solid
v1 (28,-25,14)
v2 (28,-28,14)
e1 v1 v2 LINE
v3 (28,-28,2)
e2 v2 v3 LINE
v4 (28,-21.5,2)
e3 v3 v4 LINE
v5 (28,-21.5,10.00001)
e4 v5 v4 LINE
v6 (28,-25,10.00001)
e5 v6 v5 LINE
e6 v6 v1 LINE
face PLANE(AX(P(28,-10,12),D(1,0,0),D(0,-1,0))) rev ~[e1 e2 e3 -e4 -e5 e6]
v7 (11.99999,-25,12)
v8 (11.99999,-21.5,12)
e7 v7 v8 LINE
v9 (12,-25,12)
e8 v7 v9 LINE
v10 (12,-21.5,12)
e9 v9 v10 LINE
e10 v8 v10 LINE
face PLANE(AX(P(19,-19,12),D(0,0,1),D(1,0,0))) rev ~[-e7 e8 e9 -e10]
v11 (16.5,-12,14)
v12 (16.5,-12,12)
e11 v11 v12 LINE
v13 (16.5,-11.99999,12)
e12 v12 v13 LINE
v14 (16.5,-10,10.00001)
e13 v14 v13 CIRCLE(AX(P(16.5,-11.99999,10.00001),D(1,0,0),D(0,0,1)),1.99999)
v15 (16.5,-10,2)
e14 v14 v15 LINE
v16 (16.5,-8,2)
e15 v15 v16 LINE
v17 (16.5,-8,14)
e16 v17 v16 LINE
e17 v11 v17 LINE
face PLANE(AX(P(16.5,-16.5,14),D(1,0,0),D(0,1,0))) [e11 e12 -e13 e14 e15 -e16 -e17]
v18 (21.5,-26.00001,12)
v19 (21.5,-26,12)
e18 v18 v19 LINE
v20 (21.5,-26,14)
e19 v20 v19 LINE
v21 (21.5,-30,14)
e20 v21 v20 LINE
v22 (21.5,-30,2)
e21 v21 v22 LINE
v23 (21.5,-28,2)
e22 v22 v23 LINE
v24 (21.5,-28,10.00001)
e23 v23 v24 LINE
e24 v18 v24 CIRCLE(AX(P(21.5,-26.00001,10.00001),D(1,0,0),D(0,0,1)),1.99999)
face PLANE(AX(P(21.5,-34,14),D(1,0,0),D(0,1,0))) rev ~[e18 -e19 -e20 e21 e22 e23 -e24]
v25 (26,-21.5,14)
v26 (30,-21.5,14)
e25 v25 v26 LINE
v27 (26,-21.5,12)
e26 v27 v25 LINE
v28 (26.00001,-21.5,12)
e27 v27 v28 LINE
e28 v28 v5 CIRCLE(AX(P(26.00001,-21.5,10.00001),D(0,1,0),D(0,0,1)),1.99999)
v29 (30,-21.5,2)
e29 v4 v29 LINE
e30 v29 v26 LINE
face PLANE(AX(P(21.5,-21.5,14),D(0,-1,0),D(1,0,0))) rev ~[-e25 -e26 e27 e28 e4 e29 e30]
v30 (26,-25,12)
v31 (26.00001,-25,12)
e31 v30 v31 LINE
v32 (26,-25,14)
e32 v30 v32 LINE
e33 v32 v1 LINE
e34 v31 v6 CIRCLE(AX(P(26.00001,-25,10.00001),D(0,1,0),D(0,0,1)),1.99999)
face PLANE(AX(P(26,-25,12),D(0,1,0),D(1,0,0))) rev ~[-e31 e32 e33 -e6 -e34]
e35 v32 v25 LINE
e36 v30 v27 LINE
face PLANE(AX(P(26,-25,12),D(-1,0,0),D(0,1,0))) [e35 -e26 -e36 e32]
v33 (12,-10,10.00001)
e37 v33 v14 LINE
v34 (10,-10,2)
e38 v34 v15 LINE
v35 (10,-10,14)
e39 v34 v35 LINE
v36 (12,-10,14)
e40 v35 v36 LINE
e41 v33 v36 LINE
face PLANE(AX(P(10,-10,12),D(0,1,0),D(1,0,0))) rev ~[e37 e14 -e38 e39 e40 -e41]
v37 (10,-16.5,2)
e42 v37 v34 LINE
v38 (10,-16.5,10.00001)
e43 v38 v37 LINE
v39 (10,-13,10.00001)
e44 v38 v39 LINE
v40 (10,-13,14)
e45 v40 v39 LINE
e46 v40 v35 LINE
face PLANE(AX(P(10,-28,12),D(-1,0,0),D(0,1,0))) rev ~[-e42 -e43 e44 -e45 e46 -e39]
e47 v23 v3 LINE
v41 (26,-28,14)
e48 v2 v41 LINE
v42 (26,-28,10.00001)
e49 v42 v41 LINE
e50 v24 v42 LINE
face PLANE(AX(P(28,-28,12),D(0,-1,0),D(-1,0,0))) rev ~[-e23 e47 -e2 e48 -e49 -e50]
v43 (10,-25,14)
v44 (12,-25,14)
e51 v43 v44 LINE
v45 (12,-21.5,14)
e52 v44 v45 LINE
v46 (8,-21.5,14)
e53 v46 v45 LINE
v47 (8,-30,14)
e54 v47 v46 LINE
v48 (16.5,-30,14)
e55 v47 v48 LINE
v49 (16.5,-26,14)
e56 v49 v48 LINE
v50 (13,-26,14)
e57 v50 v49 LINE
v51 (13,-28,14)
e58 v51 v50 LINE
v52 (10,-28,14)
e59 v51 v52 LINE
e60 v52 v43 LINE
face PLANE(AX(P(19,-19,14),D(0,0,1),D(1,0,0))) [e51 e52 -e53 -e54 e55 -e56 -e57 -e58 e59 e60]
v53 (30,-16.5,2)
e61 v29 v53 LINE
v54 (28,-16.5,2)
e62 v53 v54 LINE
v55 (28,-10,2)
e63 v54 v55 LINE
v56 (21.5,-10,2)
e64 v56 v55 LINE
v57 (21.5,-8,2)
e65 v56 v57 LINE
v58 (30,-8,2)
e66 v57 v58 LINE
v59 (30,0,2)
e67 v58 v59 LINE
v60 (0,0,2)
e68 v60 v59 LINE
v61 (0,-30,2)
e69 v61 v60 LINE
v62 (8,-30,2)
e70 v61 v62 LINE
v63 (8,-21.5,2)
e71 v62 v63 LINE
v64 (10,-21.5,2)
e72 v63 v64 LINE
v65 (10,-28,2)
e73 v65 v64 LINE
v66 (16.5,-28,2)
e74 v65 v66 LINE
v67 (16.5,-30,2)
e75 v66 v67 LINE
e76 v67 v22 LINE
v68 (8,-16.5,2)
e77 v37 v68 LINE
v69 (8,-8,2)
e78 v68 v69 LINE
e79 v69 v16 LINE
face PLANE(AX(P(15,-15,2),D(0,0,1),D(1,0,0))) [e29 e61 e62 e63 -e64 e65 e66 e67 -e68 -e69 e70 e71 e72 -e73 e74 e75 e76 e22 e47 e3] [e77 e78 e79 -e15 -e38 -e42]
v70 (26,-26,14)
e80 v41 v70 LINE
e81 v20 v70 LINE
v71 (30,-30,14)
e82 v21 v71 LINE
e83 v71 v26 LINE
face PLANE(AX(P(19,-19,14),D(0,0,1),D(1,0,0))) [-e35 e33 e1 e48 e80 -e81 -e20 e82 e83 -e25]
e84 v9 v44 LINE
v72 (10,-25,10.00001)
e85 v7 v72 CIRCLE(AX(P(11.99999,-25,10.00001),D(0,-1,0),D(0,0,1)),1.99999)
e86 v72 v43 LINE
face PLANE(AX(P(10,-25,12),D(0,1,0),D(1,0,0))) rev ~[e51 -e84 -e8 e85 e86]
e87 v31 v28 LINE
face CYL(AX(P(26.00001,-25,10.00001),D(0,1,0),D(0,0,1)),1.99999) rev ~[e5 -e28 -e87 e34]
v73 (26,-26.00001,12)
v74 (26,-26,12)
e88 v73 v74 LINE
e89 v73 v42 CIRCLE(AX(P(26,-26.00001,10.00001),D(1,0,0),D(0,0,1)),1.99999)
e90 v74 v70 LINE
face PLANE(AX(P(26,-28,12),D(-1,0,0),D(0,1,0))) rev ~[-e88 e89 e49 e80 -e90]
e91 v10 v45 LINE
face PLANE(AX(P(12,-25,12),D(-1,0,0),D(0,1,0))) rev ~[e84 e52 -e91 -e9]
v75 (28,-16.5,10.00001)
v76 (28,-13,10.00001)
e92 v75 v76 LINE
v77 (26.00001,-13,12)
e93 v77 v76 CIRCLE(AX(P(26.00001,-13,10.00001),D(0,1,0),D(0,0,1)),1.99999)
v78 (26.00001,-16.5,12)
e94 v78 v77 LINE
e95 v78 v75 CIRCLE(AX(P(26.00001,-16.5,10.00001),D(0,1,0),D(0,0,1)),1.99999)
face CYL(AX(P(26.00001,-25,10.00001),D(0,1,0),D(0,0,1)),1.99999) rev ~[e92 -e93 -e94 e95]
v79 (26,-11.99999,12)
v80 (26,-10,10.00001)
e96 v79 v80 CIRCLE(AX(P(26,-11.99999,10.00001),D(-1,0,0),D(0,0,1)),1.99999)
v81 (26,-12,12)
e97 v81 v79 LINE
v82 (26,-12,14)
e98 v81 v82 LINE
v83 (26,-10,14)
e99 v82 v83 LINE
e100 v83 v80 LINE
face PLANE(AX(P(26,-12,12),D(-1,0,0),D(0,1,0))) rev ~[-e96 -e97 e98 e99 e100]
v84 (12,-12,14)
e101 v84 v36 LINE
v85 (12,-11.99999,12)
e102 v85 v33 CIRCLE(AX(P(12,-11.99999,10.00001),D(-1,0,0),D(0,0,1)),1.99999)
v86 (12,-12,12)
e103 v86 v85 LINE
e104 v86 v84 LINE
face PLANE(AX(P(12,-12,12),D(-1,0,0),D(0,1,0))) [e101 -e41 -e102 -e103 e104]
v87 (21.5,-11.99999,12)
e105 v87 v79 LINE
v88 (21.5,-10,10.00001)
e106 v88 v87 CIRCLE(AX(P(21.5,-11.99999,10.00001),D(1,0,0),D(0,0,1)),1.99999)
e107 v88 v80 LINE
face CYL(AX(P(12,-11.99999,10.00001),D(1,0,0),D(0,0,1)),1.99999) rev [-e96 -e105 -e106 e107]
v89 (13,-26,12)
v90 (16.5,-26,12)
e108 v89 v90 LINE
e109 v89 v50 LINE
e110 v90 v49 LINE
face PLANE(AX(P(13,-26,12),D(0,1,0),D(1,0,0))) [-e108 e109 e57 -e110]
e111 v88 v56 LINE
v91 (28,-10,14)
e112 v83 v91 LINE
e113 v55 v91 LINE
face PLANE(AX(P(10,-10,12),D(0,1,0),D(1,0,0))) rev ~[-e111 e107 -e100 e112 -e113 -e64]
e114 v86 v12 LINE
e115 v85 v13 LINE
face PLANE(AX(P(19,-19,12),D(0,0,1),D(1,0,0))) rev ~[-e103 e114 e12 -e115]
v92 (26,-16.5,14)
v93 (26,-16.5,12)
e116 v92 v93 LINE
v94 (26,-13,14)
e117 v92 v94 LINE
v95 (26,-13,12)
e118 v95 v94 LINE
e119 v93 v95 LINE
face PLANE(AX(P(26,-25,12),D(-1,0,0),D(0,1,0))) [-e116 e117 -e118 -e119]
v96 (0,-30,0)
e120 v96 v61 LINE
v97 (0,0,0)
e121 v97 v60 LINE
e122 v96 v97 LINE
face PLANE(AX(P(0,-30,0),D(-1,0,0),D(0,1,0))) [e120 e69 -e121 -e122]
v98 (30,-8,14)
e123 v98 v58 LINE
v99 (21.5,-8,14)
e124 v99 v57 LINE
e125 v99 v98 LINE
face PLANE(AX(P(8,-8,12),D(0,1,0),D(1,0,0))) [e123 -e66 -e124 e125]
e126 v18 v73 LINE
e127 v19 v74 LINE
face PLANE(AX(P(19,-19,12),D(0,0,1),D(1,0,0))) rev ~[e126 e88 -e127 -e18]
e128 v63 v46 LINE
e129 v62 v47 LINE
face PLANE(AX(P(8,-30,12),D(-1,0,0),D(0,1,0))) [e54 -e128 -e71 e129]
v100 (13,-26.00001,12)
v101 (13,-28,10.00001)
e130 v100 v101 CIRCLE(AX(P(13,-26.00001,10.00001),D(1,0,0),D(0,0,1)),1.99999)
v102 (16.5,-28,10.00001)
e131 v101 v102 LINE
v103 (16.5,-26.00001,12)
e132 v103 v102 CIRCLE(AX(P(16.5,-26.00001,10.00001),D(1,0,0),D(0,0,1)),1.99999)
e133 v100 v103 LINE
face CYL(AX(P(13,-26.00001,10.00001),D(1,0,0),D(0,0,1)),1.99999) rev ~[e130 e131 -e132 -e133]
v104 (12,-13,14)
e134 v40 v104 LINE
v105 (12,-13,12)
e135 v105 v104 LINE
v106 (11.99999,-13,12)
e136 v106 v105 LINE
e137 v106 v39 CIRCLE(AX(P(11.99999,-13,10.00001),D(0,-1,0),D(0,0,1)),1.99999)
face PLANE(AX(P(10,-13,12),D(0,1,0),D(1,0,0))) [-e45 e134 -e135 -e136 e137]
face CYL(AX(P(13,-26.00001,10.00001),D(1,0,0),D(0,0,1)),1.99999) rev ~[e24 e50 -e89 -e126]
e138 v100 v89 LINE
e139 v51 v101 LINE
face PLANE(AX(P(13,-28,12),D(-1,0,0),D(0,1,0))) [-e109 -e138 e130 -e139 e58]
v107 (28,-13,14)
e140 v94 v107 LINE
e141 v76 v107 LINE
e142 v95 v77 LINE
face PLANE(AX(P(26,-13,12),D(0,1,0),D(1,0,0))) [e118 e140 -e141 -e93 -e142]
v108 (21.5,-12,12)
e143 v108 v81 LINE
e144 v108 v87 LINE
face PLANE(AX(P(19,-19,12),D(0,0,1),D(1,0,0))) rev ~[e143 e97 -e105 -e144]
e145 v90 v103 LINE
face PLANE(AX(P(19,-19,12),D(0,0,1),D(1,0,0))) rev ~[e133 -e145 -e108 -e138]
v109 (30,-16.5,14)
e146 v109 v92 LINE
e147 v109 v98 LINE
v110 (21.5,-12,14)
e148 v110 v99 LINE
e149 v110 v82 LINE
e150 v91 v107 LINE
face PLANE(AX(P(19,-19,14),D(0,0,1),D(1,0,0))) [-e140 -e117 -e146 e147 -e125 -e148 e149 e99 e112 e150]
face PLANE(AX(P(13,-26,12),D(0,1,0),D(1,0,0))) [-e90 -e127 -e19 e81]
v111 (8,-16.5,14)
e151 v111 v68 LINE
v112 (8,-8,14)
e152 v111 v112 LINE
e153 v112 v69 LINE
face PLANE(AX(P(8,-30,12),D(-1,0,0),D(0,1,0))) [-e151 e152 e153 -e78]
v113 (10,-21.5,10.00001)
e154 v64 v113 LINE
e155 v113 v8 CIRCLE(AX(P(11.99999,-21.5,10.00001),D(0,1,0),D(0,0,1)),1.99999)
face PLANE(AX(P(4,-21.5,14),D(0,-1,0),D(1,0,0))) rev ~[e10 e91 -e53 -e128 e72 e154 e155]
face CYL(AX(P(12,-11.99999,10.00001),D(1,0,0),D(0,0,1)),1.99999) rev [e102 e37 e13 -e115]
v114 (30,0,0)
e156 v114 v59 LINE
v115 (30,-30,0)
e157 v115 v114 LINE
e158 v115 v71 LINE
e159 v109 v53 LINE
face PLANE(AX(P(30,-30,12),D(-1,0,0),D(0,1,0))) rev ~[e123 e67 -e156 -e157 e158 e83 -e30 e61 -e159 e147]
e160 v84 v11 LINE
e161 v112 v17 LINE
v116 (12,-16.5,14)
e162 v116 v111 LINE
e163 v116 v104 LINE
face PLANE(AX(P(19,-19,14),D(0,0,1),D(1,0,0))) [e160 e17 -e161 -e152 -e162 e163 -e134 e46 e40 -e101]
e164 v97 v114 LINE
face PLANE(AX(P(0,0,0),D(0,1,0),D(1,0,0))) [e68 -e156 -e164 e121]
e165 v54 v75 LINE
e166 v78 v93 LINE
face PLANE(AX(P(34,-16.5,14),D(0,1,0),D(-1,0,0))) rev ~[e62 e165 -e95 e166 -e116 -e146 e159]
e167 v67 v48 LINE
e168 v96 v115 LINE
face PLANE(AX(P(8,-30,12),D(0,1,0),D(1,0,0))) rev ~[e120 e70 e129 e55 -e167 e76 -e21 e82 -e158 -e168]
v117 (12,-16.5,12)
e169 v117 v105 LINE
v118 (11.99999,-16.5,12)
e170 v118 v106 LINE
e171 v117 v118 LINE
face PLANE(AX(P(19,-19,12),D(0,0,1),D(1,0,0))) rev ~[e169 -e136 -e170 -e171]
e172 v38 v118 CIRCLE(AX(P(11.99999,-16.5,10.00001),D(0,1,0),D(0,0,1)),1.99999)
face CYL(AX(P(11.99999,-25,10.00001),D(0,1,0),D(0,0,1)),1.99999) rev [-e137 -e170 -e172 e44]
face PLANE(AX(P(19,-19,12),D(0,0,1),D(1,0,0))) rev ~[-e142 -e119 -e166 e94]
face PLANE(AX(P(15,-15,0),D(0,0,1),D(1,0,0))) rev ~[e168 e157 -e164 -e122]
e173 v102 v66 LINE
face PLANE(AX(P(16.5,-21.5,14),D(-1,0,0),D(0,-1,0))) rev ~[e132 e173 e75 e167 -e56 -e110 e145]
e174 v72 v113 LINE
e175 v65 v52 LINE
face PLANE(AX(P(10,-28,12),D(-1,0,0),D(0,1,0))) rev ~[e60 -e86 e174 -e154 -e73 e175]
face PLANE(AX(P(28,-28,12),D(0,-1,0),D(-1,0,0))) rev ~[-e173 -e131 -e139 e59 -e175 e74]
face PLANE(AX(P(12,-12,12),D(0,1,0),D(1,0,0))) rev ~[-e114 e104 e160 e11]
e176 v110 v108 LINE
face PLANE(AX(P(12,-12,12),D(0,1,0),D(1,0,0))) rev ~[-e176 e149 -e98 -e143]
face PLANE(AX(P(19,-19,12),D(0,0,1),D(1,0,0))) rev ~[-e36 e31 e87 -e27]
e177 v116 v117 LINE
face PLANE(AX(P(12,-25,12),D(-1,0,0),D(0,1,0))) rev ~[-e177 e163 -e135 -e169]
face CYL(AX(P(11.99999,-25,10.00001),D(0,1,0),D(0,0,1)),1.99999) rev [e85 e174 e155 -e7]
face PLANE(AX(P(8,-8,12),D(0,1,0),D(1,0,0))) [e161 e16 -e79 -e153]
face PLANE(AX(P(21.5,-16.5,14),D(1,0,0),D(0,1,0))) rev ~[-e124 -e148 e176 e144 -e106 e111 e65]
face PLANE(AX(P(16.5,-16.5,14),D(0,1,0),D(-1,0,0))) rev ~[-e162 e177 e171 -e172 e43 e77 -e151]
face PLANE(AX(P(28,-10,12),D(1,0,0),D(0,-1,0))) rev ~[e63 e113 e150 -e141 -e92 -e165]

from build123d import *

# Parameters (mm, degrees)
F0_W     = 30
F0_H     = 30
F1_DEPTH = 2
F2_W     = 22
F2_H     = 22
F2_W_2   = 18
F2_H_2   = 18
F3_DEPTH = 10
F4_W     = 22
F4_H     = 22
F4_W_2   = 2
F4_H_2   = 12
F4_W_3   = 14
F4_H_3   = 2
F4_W_4   = 13
F5_DEPTH = 2
F6_R     = 1.99999
F7_W     = 12.5
F7_H     = 5
F7_W_2   = 5
F7_H_2   = 12.5
F8_DEPTH = 12


# Not quite as in the source:
# - a fillet or chamfer is up to 0.001 mm smaller than in the source, because OpenCascade refuses the exact size


with BuildPart() as f1:
    # F0 (on Top) → F1 (new body)
    with BuildSketch(Plane.XY):
        with Locations((15, -15)):
            Rectangle(F0_W, F0_H)
    extrude(amount=F1_DEPTH)

    # F2 (on face) → F3 (join)
    with BuildSketch(Plane.XY.offset(2)):
        with Locations((19, -19)):
            Rectangle(F2_W, F2_H)
        with Locations((19, -19)):
            Rectangle(F2_W_2, F2_H_2, mode=Mode.SUBTRACT)
    extrude(amount=F3_DEPTH)

    # F4 (on face) → F5 (join)
    with BuildSketch(Plane.XY.offset(12)):
        with Locations((19, -19)):
            Rectangle(F4_W, F4_H)
        Polygon((13, -28), (10, -28), (10, -25), (10, -13), (10, -10), (12, -10), (26, -10), (28, -10), (28, -13), (28, -25), (28, -28), (26, -28), align=None, mode=Mode.SUBTRACT)
        with Locations((11, -19)):
            Rectangle(F4_W_2, F4_H_2)
        with Locations((19, -11)):
            Rectangle(F4_W_3, F4_H_3)
        with Locations((27, -19)):
            Rectangle(F4_W_2, F4_H_2)
        with Locations((19.5, -27)):
            Rectangle(F4_W_4, F4_H_3)
    extrude(amount=F5_DEPTH)

    # F6 (radius 2 in the source; OpenCascade refuses exactly that, so slightly less here)
    f6_edges = [f1.edges().sort_by_distance(p)[0] for p in [
        (10, -19, 12),
        (28, -19, 12),
        (19, -10, 12),
        (19.5, -28, 12),
    ]]
    fillet(f6_edges, radius=F6_R)

    # F7 (on face) → F8 (cut, through all)
    with BuildSketch(Plane.XY.offset(14)):
        with Locations((27.75, -19)):
            Rectangle(F7_W, F7_H)
        with Locations((19, -27.75)):
            Rectangle(F7_W_2, F7_H_2)
        with Locations((19, -19)):
            Rectangle(F7_W_2, F7_H)
        with Locations((10.25, -19)):
            Rectangle(F7_W, F7_H)
        with Locations((19, -10.25)):
            Rectangle(F7_W_2, F7_H_2)
    extrude(amount=-F8_DEPTH, mode=Mode.SUBTRACT)


solid = f1.part
